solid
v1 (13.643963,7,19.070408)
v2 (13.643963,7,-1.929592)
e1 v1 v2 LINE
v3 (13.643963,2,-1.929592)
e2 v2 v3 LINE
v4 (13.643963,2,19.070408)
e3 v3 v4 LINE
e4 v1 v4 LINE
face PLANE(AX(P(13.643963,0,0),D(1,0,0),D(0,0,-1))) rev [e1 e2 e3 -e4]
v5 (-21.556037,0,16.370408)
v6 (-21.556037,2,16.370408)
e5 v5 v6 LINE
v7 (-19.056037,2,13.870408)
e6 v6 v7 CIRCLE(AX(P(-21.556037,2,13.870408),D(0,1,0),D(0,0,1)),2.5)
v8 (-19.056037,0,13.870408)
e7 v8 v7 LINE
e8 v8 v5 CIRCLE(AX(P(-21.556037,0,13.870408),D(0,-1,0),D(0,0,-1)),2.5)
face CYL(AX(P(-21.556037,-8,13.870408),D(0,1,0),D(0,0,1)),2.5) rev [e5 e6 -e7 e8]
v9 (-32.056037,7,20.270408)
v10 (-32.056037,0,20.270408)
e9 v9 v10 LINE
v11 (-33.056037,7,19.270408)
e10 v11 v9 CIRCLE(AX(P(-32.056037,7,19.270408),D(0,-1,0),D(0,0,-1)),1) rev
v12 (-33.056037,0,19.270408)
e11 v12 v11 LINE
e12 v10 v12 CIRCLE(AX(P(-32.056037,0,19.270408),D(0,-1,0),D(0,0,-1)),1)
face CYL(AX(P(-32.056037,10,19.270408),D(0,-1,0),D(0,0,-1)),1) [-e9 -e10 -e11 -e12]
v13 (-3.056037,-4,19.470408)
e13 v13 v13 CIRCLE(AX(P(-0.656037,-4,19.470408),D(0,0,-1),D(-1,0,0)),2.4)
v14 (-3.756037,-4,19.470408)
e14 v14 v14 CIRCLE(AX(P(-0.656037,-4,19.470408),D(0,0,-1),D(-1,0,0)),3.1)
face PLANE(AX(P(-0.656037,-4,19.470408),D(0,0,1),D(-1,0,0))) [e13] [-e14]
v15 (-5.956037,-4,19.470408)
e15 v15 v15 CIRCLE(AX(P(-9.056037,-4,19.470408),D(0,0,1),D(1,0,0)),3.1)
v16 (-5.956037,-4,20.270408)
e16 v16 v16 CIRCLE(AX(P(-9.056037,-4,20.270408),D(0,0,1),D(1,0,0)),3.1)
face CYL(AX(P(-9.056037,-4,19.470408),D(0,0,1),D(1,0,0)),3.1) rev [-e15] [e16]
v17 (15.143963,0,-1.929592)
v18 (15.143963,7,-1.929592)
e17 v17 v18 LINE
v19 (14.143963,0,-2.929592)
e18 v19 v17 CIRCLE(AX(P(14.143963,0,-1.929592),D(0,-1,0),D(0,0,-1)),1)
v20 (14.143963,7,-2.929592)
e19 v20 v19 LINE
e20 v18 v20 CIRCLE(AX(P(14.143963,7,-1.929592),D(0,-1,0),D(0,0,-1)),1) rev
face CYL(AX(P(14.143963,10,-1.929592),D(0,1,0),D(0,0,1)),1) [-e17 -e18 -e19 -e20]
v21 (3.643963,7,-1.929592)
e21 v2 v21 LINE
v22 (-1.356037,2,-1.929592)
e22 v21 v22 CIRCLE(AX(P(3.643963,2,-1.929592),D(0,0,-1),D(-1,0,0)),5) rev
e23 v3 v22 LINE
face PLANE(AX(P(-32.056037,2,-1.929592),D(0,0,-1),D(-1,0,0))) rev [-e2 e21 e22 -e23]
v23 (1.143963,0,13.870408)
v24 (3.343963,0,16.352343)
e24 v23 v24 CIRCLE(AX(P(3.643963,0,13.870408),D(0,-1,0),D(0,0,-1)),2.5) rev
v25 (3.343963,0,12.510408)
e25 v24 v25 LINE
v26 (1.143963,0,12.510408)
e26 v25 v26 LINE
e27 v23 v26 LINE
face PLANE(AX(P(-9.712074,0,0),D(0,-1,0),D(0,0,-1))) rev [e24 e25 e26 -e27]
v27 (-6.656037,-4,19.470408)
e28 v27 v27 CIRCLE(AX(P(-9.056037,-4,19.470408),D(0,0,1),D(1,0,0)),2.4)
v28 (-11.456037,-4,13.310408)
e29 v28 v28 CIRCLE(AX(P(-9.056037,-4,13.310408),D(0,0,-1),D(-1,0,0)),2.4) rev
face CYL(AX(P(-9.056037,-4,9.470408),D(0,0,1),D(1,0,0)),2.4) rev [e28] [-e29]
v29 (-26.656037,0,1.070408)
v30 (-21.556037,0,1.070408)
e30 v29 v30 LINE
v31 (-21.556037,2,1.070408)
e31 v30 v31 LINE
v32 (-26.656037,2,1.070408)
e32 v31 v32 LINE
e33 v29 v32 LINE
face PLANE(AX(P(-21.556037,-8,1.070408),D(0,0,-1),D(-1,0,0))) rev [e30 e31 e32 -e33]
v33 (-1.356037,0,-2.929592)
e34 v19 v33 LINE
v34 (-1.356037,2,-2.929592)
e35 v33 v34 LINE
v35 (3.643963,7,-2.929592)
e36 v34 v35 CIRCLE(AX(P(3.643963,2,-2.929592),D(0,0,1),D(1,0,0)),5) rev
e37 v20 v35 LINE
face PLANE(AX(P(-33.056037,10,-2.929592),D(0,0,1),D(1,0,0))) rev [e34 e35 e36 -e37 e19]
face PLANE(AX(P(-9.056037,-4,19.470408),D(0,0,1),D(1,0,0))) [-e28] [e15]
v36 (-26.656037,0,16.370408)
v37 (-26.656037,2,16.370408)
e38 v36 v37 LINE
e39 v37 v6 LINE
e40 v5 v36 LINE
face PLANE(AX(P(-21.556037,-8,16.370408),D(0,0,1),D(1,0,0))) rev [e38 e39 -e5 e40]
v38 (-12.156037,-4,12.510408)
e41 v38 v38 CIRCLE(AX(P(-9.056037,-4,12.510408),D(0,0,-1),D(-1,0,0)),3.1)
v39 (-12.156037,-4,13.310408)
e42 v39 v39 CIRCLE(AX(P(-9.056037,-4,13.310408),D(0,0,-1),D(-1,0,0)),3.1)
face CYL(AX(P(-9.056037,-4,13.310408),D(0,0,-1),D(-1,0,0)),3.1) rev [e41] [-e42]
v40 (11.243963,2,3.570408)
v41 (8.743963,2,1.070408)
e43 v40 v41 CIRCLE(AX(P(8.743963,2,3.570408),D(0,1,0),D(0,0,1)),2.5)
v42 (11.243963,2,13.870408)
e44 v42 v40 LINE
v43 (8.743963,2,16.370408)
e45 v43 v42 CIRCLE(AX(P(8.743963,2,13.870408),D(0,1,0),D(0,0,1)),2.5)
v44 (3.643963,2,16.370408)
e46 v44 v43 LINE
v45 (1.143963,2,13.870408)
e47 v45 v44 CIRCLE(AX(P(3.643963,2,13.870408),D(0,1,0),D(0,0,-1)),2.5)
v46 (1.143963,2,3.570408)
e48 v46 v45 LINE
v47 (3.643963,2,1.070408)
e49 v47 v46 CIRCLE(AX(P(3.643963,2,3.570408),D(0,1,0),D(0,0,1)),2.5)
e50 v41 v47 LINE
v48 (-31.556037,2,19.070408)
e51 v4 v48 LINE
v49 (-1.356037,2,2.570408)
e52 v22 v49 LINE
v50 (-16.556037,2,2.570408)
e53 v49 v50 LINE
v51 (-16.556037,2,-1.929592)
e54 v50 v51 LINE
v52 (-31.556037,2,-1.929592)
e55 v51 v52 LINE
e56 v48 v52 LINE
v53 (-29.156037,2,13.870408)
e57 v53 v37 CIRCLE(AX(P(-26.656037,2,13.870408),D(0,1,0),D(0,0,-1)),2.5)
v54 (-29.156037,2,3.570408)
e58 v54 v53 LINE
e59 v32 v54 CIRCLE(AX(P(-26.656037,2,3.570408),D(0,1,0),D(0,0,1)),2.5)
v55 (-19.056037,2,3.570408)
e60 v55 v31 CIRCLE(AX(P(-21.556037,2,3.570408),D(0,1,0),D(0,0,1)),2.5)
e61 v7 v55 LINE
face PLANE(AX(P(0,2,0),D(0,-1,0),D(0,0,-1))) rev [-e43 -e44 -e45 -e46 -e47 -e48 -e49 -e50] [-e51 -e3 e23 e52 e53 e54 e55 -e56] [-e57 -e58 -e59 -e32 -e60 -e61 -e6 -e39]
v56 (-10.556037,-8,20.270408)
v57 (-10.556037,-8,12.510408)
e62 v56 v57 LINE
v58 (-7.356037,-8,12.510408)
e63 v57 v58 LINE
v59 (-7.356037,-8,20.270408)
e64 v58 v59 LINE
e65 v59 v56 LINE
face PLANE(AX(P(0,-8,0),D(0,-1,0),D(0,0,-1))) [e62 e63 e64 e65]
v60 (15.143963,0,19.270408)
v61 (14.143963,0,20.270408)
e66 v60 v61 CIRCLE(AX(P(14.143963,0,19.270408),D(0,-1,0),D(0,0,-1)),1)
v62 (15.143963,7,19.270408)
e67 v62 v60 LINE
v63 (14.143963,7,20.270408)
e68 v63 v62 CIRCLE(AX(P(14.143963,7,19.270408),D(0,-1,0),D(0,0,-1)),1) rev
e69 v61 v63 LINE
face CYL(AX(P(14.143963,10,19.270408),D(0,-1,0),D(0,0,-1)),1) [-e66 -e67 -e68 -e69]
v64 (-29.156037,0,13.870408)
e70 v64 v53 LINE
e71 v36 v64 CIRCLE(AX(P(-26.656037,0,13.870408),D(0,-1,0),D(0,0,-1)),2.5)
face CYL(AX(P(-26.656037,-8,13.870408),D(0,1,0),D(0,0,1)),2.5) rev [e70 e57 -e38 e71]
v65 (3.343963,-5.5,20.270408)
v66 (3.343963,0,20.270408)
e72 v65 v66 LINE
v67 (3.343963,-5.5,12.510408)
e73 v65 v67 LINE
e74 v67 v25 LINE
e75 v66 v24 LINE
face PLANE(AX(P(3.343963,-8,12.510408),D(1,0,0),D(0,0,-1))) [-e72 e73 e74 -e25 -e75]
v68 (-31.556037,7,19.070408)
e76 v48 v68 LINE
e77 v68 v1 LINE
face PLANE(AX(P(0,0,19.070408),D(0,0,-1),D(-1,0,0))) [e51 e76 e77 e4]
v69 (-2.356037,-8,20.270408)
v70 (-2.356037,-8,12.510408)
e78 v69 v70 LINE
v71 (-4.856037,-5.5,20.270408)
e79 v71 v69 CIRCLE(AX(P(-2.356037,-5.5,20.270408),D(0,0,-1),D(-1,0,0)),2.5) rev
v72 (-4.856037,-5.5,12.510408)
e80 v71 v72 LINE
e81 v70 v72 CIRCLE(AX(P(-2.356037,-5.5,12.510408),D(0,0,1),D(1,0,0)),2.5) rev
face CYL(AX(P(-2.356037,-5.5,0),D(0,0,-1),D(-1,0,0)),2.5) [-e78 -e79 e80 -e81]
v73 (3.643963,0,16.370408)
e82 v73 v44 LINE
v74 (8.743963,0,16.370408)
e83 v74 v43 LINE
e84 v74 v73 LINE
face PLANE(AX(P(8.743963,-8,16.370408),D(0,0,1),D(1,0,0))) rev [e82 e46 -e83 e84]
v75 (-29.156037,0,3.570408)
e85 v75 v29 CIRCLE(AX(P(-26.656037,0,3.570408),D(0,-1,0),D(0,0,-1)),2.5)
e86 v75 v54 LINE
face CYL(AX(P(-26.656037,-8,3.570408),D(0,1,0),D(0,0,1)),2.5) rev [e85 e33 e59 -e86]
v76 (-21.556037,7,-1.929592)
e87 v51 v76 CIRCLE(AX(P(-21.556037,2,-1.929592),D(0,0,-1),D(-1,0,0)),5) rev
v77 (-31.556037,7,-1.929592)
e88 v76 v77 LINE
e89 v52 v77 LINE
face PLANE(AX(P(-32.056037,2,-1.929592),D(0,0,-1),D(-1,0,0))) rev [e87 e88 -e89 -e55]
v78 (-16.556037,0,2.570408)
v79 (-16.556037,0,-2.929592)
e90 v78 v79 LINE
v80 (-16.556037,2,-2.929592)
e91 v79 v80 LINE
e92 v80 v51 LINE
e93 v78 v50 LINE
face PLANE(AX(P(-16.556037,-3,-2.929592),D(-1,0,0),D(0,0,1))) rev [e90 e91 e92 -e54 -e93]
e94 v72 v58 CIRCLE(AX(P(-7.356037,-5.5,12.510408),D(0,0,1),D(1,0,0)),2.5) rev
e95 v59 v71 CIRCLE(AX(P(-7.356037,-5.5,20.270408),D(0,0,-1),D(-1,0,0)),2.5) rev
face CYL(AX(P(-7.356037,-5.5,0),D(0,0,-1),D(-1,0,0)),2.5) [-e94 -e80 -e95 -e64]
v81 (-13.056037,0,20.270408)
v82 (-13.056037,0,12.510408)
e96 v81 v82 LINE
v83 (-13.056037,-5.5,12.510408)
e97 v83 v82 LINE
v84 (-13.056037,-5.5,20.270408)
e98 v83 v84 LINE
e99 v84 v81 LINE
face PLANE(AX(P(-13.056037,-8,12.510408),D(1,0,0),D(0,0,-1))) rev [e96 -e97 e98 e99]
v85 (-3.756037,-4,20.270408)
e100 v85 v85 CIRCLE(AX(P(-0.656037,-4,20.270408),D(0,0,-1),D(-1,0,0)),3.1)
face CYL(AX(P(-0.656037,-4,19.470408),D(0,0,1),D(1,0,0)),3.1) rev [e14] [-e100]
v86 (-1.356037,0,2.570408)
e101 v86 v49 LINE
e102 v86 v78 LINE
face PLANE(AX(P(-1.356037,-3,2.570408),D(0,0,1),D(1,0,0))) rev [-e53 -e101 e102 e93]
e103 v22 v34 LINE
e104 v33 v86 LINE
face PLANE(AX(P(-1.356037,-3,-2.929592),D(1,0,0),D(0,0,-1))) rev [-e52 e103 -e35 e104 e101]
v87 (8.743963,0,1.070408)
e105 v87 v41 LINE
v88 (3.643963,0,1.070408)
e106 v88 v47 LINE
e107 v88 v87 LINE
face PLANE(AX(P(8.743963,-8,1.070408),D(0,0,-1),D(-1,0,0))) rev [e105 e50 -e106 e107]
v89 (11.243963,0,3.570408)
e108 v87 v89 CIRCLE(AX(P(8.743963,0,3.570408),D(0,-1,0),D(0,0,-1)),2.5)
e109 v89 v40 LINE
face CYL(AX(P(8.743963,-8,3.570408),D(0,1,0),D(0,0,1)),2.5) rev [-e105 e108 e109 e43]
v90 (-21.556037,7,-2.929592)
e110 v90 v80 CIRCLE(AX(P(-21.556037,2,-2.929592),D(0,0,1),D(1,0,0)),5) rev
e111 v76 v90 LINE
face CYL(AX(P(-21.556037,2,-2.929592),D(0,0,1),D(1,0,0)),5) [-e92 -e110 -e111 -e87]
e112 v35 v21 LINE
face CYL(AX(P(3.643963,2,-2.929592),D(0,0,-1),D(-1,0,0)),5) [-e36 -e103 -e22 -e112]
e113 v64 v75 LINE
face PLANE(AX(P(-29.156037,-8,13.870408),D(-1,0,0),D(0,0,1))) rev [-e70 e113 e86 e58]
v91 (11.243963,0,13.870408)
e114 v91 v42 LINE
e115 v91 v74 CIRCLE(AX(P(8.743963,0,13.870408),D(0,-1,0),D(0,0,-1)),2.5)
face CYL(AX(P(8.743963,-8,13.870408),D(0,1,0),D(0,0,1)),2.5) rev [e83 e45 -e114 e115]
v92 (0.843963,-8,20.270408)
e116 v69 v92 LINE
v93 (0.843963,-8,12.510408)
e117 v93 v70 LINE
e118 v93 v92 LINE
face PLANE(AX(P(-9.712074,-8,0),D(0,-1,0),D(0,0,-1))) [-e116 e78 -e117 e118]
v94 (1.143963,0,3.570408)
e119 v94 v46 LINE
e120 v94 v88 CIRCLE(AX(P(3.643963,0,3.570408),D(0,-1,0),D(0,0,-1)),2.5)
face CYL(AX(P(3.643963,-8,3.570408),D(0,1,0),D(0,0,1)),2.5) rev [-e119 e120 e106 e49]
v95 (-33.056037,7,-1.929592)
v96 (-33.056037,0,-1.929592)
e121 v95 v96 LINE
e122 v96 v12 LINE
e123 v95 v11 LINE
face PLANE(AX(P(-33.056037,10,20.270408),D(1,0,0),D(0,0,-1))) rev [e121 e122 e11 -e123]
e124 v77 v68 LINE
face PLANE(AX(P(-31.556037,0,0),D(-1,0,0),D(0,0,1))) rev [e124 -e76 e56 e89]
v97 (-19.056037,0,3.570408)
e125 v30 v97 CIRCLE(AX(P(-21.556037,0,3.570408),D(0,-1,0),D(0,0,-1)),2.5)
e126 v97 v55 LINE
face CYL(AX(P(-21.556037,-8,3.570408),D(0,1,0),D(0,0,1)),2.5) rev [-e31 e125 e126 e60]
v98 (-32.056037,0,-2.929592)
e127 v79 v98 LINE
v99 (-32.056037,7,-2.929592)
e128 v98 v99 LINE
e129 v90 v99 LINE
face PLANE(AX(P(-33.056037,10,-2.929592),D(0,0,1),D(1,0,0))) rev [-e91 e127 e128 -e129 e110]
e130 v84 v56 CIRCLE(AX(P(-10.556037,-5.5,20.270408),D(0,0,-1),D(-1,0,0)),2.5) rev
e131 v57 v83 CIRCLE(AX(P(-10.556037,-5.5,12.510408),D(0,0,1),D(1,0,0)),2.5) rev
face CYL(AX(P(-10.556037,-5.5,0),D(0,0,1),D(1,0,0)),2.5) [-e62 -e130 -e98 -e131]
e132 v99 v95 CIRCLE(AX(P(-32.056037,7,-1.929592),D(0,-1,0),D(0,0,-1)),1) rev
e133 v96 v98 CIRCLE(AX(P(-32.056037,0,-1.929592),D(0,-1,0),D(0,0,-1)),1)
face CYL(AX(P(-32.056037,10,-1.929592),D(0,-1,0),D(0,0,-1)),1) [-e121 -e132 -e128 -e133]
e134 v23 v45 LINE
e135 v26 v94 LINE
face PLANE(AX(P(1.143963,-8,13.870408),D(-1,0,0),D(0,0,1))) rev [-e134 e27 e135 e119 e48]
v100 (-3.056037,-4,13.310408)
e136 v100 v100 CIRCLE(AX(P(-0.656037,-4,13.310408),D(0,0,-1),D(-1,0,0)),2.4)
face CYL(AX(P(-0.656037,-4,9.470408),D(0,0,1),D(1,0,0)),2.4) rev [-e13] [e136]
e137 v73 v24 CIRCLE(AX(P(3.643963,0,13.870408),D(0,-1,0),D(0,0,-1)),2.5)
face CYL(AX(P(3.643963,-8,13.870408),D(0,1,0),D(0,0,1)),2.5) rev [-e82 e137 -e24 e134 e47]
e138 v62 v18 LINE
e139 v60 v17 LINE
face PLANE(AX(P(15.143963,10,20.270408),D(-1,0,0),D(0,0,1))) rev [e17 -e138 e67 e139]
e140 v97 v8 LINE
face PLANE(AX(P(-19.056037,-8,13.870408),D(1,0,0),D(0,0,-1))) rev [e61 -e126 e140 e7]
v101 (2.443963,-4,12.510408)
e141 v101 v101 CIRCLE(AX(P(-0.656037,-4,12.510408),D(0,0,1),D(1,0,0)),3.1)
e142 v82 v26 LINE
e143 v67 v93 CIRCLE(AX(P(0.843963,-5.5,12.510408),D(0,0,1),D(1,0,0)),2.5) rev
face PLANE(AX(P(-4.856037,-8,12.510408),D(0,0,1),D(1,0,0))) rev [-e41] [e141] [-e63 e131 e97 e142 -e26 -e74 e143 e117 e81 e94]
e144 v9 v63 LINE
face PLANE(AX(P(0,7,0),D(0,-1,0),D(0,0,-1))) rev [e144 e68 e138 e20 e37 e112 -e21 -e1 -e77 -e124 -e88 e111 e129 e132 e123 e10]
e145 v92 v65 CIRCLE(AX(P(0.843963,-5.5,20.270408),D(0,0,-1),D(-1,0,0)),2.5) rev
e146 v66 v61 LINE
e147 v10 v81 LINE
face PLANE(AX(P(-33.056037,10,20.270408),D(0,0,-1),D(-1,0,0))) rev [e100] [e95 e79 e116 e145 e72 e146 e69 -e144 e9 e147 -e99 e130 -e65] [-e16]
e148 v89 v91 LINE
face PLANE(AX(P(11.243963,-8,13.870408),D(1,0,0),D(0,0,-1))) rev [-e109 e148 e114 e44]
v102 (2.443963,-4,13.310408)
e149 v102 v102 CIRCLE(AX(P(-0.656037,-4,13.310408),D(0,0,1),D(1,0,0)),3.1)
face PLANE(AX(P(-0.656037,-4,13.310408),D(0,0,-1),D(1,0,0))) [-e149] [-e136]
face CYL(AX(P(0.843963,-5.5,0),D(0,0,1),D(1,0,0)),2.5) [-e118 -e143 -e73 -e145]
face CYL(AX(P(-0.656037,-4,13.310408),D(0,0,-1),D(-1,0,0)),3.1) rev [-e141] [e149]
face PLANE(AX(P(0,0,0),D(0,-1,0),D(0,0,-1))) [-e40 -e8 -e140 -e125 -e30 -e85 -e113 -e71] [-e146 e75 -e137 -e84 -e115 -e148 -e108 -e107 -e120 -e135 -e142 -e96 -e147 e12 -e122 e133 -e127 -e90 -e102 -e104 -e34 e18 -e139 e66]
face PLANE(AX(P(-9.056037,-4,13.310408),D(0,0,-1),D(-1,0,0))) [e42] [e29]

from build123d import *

# Parameters (mm, degrees)
SKETCH1_W           = 48.2
SKETCH1_H           = 23.2
BOSS_EXTRUDE1_DEPTH = 10
SKETCH2_W           = 46.2
SKETCH2_H           = 21.2
CUT_EXTRUDE1_DEPTH  = 8
SKETCH3_W           = 11.2
SKETCH3_H           = 5
CUT_EXTRUDE2_DEPTH  = 10
SKETCH4_W           = 48.2
SKETCH4_H           = 23.2
CUT_EXTRUDE3_DEPTH  = 3
SKETCH5_W           = 8.2
SKETCH5_H           = 7.76
BOSS_EXTRUDE2_DEPTH = 8
SKETCH6_R           = 3.1
CUT_EXTRUDE4_DEPTH  = 0.8
SKETCH7_R           = 2.4
CUT_EXTRUDE5_DEPTH  = 10
SKETCH8_W           = 46.2
SKETCH8_H           = 20.3
CUT_EXTRUDE6_DEPTH  = 5
SKETCH9_W           = 45.4
SKETCH9_H           = 20.3
CUT_EXTRUDE8_DEPTH  = 5
CUT_EXTRUDE9_START  = -0.8
SKETCH10_R          = 3.1
CUT_EXTRUDE9_DEPTH  = 0.8
SKETCH11_W          = 15.2
SKETCH11_H          = 5.5
CUT_EXTRUDE10_DEPTH = 10
CUT_EXTRUDE11_DEPTH = 10
FILLET1_R           = 1
FILLET2_R           = 1
FILLET3_R           = 1
FILLET4_R           = 1
FILLET5_R           = 2.5
FILLET6_R           = 2.5
FILLET7_R           = 5
FILLET8_R           = 5
SKETCH13_W          = 21.2
SKETCH13_H          = 5
BOSS_EXTRUDE3_DEPTH = 0.5
SKETCH14_W          = 21.2
SKETCH14_H          = 5
BOSS_EXTRUDE4_DEPTH = 0.5
SKETCH16_W          = 45.2
SKETCH16_H          = 5
BOSS_EXTRUDE5_DEPTH = 0.2
MIRROR4_START       = 13.310407833
MIRROR4_OUTLINE_R   = 2.4
MIRROR4_DEPTH       = 6.16
MIRROR4_START_2     = 12.510407833
MIRROR4_2_OUTLINE_R = 3.1
MIRROR4_2_DEPTH     = 7.76


# Read off the part's stored shape, not the designer's step: Mirror4
with BuildPart() as part:
    # Sketch1 → Boss-Extrude1 (new body)
    with BuildSketch(Plane(origin=(0, 0, 0), x_dir=(1, 0, 0), z_dir=(0, 1, 0))):
        with Locations((-8.956036835, -8.670407833)):
            Rectangle(SKETCH1_W, SKETCH1_H)
    extrude(amount=BOSS_EXTRUDE1_DEPTH)

    # Sketch2 → Cut-Extrude1 (cut)
    with BuildSketch(Plane(origin=(0, 10, 0), x_dir=(1, 0, 0), z_dir=(0, 1, 0))):
        with Locations((-8.956036835, -8.670407833)):
            Rectangle(SKETCH2_W, SKETCH2_H)
    extrude(amount=-CUT_EXTRUDE1_DEPTH, mode=Mode.SUBTRACT)

    # Sketch3 → Cut-Extrude2 (cut)
    with BuildSketch(Plane(origin=(0, 10, 0), x_dir=(1, 0, 0), z_dir=(0, 1, 0))):
        with Locations((-8.956036835, 0.429592167)):
            Rectangle(SKETCH3_W, SKETCH3_H)
    extrude(amount=-CUT_EXTRUDE2_DEPTH, mode=Mode.SUBTRACT)

    # Sketch4 → Cut-Extrude3 (cut)
    with BuildSketch(Plane(origin=(0, 10, 0), x_dir=(1, 0, 0), z_dir=(0, 1, 0))):
        with Locations((-8.956036835, -8.670407833)):
            Rectangle(SKETCH4_W, SKETCH4_H)
    extrude(amount=-CUT_EXTRUDE3_DEPTH, mode=Mode.SUBTRACT)

    # Sketch5 → Boss-Extrude2 (add)
    with BuildSketch(Plane(origin=(0, 0, 0), x_dir=(-1, 0, 0), z_dir=(0, -1, 0))):
        with Locations((8.956036835, -16.390407833)):
            Rectangle(SKETCH5_W, SKETCH5_H)
    extrude(amount=BOSS_EXTRUDE2_DEPTH)

    # Sketch6 → Cut-Extrude4 (cut)
    with BuildSketch(Plane.XY.offset(20.270407833)):
        with Locations((-9.056036835, -4)):
            Circle(SKETCH6_R)
    extrude(amount=-CUT_EXTRUDE4_DEPTH, mode=Mode.SUBTRACT)

    # Sketch7 → Cut-Extrude5 (cut)
    with BuildSketch(Plane.XY.offset(19.470407833)):
        with Locations((-9.056036835, -4)):
            Circle(SKETCH7_R)
    extrude(amount=-CUT_EXTRUDE5_DEPTH, mode=Mode.SUBTRACT)

    # Sketch8 → Cut-Extrude6 (cut)
    with BuildSketch(Plane(origin=(0, 7, 0), x_dir=(1, 0, 0), z_dir=(0, 1, 0))):
        with Locations((-8.956036835, -8.720407833)):
            Rectangle(SKETCH8_W, SKETCH8_H)
    extrude(amount=-CUT_EXTRUDE6_DEPTH, mode=Mode.SUBTRACT)

    # Sketch9 → Cut-Extrude8 (cut)
    with BuildSketch(Plane(origin=(0, 7, 0), x_dir=(1, 0, 0), z_dir=(0, 1, 0))):
        with Locations((-8.956036835, -8.720407833)):
            Rectangle(SKETCH9_W, SKETCH9_H)
    extrude(amount=-CUT_EXTRUDE8_DEPTH, mode=Mode.SUBTRACT)

    # Sketch10 → Cut-Extrude9 (cut)
    with BuildSketch(Plane(origin=(0, 0, 12.510407833), x_dir=(-1, 0, 0), z_dir=(0, 0, -1)).offset(CUT_EXTRUDE9_START)):
        with Locations(Location((9.056036835, -4, 0), (0, 0, 180))):
            Circle(SKETCH10_R)
    extrude(amount=CUT_EXTRUDE9_DEPTH, mode=Mode.SUBTRACT)

    # Sketch11 → Cut-Extrude10 (cut)
    with BuildSketch(Plane(origin=(0, 7, 0), x_dir=(1, 0, 0), z_dir=(0, 1, 0))):
        with Locations((-8.956036835, 0.179592167)):
            Rectangle(SKETCH11_W, SKETCH11_H)
    extrude(amount=-CUT_EXTRUDE10_DEPTH, mode=Mode.SUBTRACT)

    # Sketch12 → Cut-Extrude11 (cut)
    with BuildSketch(Plane(origin=(0, 2, 0), x_dir=(1, 0, 0), z_dir=(0, 1, 0))):
        with BuildLine():
            Line((8.743963165, -16.370407833), (3.643963165, -16.370407833))
            ThreePointArc((3.643963165, -16.370407833), (1.876196212, -15.638174786), (1.143963165, -13.870407833))
            Line((1.143963165, -13.870407833), (1.143963165, -3.570407833))
            ThreePointArc((1.143963165, -3.570407833), (1.876196212, -1.80264088), (3.643963165, -1.070407833))
            Line((3.643963165, -1.070407833), (8.743963165, -1.070407833))
            ThreePointArc((8.743963165, -1.070407833), (10.511730118, -1.80264088), (11.243963165, -3.570407833))
            Line((11.243963165, -3.570407833), (11.243963165, -13.870407833))
            ThreePointArc((11.243963165, -13.870407833), (10.511730118, -15.638174786), (8.743963165, -16.370407833))
        make_face()
        with BuildLine():
            Line((-21.556036835, -16.370407833), (-26.656036835, -16.370407833))
            ThreePointArc((-26.656036835, -16.370407833), (-28.423803788, -15.638174786), (-29.156036835, -13.870407833))
            Line((-29.156036835, -13.870407833), (-29.156036835, -3.570407833))
            ThreePointArc((-29.156036835, -3.570407833), (-28.423803788, -1.80264088), (-26.656036835, -1.070407833))
            Line((-26.656036835, -1.070407833), (-21.556036835, -1.070407833))
            ThreePointArc((-21.556036835, -1.070407833), (-19.788269882, -1.80264088), (-19.056036835, -3.570407833))
            Line((-19.056036835, -3.570407833), (-19.056036835, -13.870407833))
            ThreePointArc((-19.056036835, -13.870407833), (-19.788269882, -15.638174786), (-21.556036835, -16.370407833))
        make_face()
    extrude(amount=-CUT_EXTRUDE11_DEPTH, mode=Mode.SUBTRACT)

    # Fillet1
    fillet1_edges = [part.edges().sort_by_distance(p)[0] for p in [
        (15.143963165, 3.5, -2.929592167),
    ]]
    fillet(fillet1_edges, radius=FILLET1_R)

    # Fillet2
    fillet2_edges = [part.edges().sort_by_distance(p)[0] for p in [
        (15.143963165, 3.5, 20.270407833),
    ]]
    fillet(fillet2_edges, radius=FILLET2_R)

    # Fillet3
    fillet3_edges = [part.edges().sort_by_distance(p)[0] for p in [
        (-33.056036835, 3.5, 20.270407833),
    ]]
    fillet(fillet3_edges, radius=FILLET3_R)

    # Fillet4
    fillet4_edges = [part.edges().sort_by_distance(p)[0] for p in [
        (-33.056036835, 3.5, -2.929592167),
    ]]
    fillet(fillet4_edges, radius=FILLET4_R)

    # Fillet5
    fillet5_edges = [part.edges().sort_by_distance(p)[0] for p in [
        (-13.056036835, -8, 16.390407833),
    ]]
    fillet(fillet5_edges, radius=FILLET5_R)

    # Fillet6
    fillet6_edges = [part.edges().sort_by_distance(p)[0] for p in [
        (-4.856036835, -8, 16.390407833),
    ]]
    fillet(fillet6_edges, radius=FILLET6_R)

    # Fillet7
    fillet7_edges = [part.edges().sort_by_distance(p)[0] for p in [
        (-1.356036835, 7, -2.429592167),
    ]]
    fillet(fillet7_edges, radius=FILLET7_R)

    # Fillet8
    fillet8_edges = [part.edges().sort_by_distance(p)[0] for p in [
        (-16.556036835, 7, -2.429592167),
    ]]
    fillet(fillet8_edges, radius=FILLET8_R)

    # Sketch13 → Boss-Extrude3 (add)
    with BuildSketch(Plane.ZY.offset(-14.143963165)):
        with Locations((8.670407833, 4.5)):
            Rectangle(SKETCH13_W, SKETCH13_H)
    extrude(amount=BOSS_EXTRUDE3_DEPTH)

    # Sketch14 → Boss-Extrude4 (add)
    with BuildSketch(Plane(origin=(-32.056036835, 0, 0), x_dir=(0, 0, -1), z_dir=(1, 0, 0))):
        with Locations((-8.670407833, 4.5)):
            Rectangle(SKETCH14_W, SKETCH14_H)
    extrude(amount=BOSS_EXTRUDE4_DEPTH)

    # Sketch16 → Boss-Extrude5 (add)
    with BuildSketch(Plane(origin=(0, 0, 19.270407833), x_dir=(-1, 0, 0), z_dir=(0, 0, -1))):
        with Locations((8.956036835, 4.5)):
            Rectangle(SKETCH16_W, SKETCH16_H)
    extrude(amount=BOSS_EXTRUDE5_DEPTH)

    # Mirror4 outline → Mirror4 (add)
    with BuildSketch(Plane.XY.offset(MIRROR4_START)):
        with BuildLine():
            ThreePointArc((-4.856036835, -5.5), (-4.123803788, -7.267766953), (-2.356036835, -8))
            Line((-2.356036835, -8), (0.843963165, -8))
            ThreePointArc((0.843963165, -8), (2.611730118, -7.267766953), (3.343963165, -5.5))
            Line((3.343963165, -5.5), (3.343963165, 0))
            Line((3.343963165, 0), (-4.856036835, 0))
            Line((-4.856036835, 0), (-4.856036835, -5.5))
        make_face()
        with Locations((-0.656036835, -4)):
            Circle(MIRROR4_OUTLINE_R, mode=Mode.SUBTRACT)
    extrude(amount=MIRROR4_DEPTH)

    # Mirror4 2 outline → Mirror4 2 (add)
    with BuildSketch(Plane.XY.offset(MIRROR4_START_2)):
        with BuildLine():
            ThreePointArc((-4.856036835, -5.5), (-4.123803788, -7.267766953), (-2.356036835, -8))
            Line((-2.356036835, -8), (0.843963165, -8))
            ThreePointArc((0.843963165, -8), (2.611730118, -7.267766953), (3.343963165, -5.5))
            Line((3.343963165, -5.5), (3.343963165, 0))
            Line((3.343963165, 0), (-4.856036835, 0))
            Line((-4.856036835, 0), (-4.856036835, -5.5))
        make_face()
        with Locations((-0.656036835, -4)):
            Circle(MIRROR4_2_OUTLINE_R, mode=Mode.SUBTRACT)
    extrude(amount=MIRROR4_2_DEPTH)


solid = part.part
